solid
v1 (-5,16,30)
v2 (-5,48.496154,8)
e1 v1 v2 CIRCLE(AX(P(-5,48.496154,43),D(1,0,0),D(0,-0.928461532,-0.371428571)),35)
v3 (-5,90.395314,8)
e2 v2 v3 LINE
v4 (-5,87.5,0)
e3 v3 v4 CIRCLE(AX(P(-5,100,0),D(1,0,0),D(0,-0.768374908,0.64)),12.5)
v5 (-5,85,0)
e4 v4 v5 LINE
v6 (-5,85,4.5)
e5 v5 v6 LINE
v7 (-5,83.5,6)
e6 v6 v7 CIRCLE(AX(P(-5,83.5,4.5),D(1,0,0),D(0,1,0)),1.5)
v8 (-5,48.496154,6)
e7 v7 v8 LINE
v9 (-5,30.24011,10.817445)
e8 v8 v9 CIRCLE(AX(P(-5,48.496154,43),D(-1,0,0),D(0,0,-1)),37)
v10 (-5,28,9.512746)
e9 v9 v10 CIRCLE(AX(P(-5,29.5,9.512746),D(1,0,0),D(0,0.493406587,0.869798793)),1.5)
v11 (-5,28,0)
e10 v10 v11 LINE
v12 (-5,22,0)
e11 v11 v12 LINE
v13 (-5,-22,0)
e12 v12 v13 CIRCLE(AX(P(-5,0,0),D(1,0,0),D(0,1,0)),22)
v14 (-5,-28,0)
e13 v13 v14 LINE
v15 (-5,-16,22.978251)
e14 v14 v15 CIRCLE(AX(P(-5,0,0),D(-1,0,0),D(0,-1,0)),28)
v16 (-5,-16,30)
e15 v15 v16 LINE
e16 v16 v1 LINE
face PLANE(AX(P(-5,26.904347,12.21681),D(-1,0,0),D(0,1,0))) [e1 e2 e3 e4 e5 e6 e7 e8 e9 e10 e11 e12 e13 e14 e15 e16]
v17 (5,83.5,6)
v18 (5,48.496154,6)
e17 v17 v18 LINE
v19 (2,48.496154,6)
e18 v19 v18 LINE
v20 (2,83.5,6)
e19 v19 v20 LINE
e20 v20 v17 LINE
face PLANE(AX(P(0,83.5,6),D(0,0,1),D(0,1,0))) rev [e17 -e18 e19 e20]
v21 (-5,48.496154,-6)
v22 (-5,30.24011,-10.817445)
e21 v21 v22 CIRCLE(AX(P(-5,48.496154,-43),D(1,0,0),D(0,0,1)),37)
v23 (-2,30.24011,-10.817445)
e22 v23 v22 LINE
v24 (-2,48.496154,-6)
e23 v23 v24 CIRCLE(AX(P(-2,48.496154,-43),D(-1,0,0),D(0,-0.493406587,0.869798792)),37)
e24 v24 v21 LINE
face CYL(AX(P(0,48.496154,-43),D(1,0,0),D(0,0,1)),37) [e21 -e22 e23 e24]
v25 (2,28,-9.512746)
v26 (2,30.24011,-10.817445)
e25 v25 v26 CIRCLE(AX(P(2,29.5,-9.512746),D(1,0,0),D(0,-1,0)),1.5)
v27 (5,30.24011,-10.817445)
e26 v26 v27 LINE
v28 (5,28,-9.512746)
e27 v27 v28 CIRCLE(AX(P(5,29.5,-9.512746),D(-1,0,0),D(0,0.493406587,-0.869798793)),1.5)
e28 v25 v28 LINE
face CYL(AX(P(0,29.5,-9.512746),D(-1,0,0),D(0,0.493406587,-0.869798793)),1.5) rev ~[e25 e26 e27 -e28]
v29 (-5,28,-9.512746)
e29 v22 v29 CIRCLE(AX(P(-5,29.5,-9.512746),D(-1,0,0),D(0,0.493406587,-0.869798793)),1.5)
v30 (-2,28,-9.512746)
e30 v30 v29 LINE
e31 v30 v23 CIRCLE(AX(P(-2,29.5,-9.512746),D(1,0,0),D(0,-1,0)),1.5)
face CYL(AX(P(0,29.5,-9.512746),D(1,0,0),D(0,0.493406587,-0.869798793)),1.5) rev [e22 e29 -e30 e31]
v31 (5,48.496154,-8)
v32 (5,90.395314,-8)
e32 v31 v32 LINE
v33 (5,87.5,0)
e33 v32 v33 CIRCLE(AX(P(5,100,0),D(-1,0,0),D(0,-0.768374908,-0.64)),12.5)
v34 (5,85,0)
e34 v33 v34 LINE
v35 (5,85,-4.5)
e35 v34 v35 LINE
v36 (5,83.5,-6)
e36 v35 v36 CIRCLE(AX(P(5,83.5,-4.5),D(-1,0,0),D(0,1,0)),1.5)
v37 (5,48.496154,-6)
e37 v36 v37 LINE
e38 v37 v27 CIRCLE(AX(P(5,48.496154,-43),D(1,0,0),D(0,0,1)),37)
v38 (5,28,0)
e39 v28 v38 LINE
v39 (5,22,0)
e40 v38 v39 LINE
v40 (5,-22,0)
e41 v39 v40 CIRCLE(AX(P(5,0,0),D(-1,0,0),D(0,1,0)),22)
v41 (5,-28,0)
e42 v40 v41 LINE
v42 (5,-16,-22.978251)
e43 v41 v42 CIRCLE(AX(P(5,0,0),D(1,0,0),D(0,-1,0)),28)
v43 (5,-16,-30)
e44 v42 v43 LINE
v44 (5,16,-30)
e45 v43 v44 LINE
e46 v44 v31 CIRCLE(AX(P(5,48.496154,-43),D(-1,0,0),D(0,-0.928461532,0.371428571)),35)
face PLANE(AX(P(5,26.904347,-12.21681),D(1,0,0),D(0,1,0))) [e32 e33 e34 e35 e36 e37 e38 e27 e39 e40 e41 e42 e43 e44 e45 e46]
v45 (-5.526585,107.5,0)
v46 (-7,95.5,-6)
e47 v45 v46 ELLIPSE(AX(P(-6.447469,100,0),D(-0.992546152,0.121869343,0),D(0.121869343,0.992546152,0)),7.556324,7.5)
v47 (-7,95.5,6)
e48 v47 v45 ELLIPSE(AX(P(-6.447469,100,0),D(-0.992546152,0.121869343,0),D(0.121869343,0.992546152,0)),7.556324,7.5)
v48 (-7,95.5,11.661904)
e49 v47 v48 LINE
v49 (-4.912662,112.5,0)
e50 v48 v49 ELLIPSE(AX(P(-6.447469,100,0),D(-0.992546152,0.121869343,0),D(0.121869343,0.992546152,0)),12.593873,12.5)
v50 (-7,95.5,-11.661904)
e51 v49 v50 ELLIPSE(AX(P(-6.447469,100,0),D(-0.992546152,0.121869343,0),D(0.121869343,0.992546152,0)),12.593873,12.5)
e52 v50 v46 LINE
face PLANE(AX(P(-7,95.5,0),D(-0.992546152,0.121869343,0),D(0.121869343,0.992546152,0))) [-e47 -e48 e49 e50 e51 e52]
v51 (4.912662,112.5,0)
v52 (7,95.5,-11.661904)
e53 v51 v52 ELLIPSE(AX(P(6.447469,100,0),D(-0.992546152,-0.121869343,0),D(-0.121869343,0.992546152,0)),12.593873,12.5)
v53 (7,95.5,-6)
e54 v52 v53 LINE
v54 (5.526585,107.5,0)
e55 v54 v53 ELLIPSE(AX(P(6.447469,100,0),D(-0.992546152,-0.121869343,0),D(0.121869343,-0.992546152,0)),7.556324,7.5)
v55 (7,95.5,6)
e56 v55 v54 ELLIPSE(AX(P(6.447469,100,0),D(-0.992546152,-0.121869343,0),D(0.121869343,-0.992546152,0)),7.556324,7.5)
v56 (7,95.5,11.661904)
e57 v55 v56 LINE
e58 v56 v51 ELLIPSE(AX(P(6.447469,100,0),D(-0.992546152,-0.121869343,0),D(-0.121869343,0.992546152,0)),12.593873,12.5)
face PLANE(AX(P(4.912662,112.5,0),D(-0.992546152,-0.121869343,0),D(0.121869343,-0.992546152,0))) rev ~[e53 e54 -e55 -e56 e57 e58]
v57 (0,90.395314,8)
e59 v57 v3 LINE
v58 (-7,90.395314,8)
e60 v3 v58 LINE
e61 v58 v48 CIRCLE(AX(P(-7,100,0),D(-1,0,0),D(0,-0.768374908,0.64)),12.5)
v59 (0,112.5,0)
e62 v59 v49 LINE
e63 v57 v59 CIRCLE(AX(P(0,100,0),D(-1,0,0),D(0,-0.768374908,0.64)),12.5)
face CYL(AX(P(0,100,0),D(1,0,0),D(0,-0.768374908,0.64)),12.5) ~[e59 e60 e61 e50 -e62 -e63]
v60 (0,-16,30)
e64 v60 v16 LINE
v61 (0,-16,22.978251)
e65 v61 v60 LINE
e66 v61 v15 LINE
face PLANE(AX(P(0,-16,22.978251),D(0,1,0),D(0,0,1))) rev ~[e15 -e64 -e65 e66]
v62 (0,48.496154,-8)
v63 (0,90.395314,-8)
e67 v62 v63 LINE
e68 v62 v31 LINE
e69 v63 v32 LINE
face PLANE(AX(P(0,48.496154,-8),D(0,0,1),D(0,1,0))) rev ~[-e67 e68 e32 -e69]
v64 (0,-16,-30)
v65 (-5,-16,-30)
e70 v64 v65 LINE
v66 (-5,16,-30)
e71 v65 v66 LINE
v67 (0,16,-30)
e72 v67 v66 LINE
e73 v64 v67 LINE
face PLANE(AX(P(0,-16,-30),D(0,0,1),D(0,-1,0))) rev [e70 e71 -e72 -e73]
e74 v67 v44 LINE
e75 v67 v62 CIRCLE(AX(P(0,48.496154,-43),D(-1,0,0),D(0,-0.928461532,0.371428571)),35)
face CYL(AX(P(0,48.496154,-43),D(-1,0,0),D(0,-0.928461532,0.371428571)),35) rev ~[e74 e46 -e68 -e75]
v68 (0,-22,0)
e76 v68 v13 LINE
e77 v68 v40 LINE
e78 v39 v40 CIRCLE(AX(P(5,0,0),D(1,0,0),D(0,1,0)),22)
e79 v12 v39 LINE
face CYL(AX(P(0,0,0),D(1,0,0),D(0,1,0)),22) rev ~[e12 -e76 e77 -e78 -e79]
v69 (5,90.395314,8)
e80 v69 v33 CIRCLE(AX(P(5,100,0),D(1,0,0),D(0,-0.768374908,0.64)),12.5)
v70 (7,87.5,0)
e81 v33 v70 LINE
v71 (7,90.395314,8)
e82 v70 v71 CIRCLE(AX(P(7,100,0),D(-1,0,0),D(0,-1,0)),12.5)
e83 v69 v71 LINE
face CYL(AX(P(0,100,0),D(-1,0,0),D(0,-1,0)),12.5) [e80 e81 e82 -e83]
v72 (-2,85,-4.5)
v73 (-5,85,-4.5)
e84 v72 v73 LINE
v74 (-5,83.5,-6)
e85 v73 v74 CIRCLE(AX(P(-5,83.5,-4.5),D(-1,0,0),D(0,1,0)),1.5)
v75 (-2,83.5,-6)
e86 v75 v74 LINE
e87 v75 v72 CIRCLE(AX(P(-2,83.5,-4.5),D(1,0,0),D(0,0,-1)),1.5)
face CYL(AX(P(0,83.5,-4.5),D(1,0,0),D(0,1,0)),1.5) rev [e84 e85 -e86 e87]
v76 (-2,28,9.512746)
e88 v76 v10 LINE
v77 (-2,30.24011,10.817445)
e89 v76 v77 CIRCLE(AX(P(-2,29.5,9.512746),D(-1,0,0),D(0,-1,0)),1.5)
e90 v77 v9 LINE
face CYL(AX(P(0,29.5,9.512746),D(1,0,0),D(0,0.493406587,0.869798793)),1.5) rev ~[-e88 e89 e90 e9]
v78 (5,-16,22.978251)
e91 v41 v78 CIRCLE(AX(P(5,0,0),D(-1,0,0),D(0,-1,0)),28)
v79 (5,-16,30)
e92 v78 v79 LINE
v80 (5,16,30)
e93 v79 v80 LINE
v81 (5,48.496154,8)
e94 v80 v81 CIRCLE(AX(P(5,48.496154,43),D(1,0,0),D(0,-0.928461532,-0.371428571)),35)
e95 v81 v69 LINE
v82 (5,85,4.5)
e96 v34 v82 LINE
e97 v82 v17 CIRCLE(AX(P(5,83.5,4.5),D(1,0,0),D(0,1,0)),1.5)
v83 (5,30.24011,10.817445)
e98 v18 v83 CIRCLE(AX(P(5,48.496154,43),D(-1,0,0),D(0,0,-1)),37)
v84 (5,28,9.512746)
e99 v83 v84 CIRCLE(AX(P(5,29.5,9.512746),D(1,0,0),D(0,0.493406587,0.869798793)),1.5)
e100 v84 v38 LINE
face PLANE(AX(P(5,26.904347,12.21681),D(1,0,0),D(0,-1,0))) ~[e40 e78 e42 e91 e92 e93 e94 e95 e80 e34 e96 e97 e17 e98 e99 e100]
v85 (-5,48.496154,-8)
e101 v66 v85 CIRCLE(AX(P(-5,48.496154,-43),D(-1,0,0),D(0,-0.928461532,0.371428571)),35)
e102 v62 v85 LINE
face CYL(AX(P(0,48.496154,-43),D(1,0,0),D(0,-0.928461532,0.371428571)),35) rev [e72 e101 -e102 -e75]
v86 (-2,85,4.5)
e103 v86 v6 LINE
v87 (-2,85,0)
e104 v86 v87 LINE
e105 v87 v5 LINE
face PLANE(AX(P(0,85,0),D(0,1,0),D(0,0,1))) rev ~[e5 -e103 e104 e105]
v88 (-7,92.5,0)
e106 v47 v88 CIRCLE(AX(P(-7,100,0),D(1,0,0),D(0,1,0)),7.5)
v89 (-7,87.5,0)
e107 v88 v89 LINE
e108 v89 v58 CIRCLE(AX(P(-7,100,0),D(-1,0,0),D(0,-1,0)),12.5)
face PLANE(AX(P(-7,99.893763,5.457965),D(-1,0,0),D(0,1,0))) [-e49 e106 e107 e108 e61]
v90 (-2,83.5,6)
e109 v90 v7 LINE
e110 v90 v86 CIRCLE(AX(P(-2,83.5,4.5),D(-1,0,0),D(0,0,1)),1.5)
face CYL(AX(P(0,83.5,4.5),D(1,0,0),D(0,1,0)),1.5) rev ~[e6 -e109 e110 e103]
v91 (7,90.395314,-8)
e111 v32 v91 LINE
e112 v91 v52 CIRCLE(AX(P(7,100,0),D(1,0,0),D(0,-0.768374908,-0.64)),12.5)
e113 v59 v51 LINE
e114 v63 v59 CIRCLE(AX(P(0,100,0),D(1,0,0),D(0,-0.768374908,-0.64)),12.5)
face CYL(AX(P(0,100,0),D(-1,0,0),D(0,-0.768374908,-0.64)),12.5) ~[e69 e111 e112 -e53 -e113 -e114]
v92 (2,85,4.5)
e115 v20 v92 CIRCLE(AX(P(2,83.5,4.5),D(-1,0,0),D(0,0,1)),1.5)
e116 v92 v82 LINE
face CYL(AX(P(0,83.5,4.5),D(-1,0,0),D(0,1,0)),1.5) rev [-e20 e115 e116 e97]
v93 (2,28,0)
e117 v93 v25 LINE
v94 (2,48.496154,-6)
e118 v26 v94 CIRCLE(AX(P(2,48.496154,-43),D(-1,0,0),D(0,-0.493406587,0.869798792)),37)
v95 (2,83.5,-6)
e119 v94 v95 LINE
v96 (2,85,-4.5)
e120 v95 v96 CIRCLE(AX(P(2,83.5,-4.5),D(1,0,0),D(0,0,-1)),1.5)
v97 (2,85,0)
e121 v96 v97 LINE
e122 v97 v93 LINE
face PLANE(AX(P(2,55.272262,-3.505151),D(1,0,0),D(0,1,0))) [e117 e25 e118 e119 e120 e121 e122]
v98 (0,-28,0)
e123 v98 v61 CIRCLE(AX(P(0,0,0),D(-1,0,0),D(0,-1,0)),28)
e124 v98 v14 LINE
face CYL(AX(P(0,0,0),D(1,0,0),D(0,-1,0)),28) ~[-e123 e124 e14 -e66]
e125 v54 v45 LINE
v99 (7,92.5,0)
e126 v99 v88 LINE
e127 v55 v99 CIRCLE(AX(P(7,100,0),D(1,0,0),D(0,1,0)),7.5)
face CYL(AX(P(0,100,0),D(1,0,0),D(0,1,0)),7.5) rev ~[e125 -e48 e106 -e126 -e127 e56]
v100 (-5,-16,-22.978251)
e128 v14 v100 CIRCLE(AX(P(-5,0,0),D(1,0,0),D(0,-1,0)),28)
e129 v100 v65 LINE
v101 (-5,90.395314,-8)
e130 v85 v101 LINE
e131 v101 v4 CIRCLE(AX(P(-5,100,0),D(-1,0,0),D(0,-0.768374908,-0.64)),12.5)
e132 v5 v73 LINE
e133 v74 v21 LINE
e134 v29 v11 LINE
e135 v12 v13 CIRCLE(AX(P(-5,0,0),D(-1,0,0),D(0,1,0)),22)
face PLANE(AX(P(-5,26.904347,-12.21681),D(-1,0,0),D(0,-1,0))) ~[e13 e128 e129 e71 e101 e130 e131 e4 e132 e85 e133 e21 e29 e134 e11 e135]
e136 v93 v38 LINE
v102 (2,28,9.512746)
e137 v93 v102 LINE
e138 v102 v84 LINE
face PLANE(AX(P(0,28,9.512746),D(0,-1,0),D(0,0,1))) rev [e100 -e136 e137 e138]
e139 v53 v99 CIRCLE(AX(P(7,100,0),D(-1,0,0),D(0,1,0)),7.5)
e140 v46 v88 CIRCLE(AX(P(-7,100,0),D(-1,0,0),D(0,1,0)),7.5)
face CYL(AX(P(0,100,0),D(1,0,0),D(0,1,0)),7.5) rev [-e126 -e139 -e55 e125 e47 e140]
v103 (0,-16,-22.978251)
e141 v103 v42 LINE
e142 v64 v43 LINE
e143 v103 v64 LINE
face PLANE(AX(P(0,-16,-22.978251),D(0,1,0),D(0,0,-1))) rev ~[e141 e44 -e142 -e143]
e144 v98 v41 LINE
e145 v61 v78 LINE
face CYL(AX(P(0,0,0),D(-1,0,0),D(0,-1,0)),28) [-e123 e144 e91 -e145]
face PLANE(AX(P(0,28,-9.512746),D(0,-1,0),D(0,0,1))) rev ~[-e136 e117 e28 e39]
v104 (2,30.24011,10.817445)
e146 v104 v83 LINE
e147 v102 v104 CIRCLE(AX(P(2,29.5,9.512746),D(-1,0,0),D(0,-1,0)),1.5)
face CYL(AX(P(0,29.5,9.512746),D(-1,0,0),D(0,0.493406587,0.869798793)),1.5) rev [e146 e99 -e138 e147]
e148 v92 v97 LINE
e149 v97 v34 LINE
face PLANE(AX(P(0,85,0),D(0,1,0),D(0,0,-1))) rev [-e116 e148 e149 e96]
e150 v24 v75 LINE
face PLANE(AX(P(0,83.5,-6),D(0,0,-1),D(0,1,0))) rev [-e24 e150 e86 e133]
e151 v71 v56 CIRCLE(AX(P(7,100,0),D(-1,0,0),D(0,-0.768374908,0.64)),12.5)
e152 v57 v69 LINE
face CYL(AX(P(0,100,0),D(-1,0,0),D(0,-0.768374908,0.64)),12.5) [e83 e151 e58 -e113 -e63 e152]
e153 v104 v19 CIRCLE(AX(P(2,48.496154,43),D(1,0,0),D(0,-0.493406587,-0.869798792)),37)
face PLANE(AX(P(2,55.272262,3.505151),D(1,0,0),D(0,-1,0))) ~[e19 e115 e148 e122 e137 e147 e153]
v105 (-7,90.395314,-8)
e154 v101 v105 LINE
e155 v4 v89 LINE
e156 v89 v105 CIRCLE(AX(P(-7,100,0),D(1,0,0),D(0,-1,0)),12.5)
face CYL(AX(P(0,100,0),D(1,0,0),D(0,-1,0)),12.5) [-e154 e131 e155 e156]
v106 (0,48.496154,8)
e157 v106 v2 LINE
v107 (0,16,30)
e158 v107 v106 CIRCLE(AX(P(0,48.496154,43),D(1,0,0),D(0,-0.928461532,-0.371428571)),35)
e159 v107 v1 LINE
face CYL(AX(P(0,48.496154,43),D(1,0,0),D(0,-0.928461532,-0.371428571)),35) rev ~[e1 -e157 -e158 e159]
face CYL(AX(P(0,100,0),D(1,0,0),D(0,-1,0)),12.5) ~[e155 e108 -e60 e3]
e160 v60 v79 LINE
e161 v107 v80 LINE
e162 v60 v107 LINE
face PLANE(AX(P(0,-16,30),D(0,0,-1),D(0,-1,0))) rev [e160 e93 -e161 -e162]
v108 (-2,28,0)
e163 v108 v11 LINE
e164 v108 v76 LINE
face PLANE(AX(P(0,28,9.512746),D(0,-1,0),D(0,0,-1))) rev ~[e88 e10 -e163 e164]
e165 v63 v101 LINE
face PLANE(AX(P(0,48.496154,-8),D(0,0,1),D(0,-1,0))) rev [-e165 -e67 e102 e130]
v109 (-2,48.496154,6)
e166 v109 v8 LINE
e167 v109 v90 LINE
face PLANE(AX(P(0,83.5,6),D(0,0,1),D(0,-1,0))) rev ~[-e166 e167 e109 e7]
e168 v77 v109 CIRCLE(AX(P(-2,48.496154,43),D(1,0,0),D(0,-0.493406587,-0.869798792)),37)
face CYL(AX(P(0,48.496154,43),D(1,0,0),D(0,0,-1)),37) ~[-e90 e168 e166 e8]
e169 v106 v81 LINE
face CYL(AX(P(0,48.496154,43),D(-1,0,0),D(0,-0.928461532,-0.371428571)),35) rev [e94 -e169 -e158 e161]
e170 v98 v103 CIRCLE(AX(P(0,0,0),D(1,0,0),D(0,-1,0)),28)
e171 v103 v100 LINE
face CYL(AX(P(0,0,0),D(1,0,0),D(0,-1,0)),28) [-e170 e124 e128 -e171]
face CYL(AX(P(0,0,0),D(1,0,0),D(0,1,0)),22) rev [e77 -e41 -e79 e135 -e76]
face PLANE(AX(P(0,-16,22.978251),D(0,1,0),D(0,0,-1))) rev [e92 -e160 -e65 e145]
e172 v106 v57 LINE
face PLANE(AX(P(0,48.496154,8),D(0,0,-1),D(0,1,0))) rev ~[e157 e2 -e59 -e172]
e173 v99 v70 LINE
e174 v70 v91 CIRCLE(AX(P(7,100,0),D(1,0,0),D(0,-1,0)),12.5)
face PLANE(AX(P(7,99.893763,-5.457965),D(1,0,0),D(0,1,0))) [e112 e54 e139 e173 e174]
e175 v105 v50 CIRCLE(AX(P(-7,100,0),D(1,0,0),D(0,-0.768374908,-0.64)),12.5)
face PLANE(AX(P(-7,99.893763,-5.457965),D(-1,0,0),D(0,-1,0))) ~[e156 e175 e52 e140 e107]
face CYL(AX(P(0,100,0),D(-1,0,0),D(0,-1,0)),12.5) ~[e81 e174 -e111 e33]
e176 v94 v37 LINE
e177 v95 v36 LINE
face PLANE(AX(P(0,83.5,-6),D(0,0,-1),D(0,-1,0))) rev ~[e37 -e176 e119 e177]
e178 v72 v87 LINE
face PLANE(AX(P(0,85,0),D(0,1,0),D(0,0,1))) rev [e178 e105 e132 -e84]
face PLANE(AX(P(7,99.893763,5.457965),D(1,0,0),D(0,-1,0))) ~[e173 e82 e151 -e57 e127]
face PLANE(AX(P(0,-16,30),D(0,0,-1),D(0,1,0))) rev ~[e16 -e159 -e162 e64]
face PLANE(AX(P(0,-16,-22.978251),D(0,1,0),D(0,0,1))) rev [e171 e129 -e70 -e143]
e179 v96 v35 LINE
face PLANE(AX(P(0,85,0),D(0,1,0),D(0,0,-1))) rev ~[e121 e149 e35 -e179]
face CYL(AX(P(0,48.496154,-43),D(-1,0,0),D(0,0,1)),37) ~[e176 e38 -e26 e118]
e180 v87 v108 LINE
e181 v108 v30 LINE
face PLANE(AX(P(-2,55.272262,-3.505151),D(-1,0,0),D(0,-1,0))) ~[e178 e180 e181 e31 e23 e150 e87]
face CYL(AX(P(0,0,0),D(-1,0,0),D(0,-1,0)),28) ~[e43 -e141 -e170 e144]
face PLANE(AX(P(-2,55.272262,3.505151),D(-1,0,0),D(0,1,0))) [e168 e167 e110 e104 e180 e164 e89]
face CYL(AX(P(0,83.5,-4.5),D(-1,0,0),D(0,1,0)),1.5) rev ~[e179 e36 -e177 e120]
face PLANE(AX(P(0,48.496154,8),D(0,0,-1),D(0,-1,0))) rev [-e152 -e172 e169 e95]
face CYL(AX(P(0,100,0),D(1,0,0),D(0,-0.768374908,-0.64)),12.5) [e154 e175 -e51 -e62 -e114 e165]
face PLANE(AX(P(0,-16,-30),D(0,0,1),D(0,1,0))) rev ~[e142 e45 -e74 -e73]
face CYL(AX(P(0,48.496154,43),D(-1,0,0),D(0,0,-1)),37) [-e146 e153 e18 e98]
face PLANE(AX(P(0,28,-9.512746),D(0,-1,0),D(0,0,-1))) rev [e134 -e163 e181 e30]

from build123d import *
from build123d import SkipClean  # not in build123d's __all__

# Parameters (mm, degrees)
F1_DEPTH = 7
F2_DEPTH = 5
F3_DEPTH = 2
F7_DEPTH = 25


with BuildPart() as f1:
    # F0 (on Right) → F1 (new body)
    with BuildSketch(Plane.YZ):
        with BuildLine():
            ThreePointArc((107.5, 0), (100, -7.5), (92.5, 0))
            Line((92.5, 0), (87.5, 0))
            ThreePointArc((87.5, 0), (88.2460947032, -4.2539052968), (90.3953136439, -8))
            ThreePointArc((90.3953136439, -8), (104.2539052968, -11.7539052968), (112.5, 0))
            Line((112.5, 0), (107.5, 0))
        make_face()
    extrude(amount=F1_DEPTH)

    # F0 (on Right) → F2 (join)
    with BuildSketch(Plane.YZ):
        with BuildLine():
            ThreePointArc((90.3953136439, -8), (88.2460947032, -4.2539052968), (87.5, 0))
            Line((87.5, 0), (85, 0))
            Line((85, 0), (85, -4.5))
            ThreePointArc((85, -4.5), (84.5606601718, -5.5606601718), (83.5, -6))
            Line((83.5, -6), (48.4961536185, -6))
            ThreePointArc((48.4961536185, -6), (39.0556702336, -7.2246275567), (30.2401098812, -10.8174446779))
            ThreePointArc((30.2401098812, -10.8174446779), (28.7450711364, -10.8089264191), (28, -9.5127464891))
            Line((28, -9.5127464891), (28, 0))
            Line((28, 0), (22, 0))
            ThreePointArc((22, 0), (0, -22), (-22, 0))
            Line((-22, 0), (-28, 0))
            ThreePointArc((-28, 0), (-24.819347292, -12.9614813968), (-16, -22.9782505862))
            Line((-16, -22.9782505862), (-16, -30))
            Line((-16, -30), (16, -30))
            ThreePointArc((16, -30), (28.8747367482, -14.0172465076), (48.4961536185, -8))
            Line((48.4961536185, -8), (90.3953136439, -8))
        make_face()
    extrude(amount=F2_DEPTH)

    # F0 (on Right) → F3 (join)
    with BuildSketch(Plane.YZ):
        with BuildLine():
            Line((85, -4.5), (85, 0))
            Line((85, 0), (28, 0))
            Line((28, 0), (28, -9.5127464891))
            ThreePointArc((28, -9.5127464891), (28.7450711364, -10.8089264191), (30.2401098812, -10.8174446779))
            ThreePointArc((30.2401098812, -10.8174446779), (39.0556702336, -7.2246275567), (48.4961536185, -6))
            Line((48.4961536185, -6), (83.5, -6))
            ThreePointArc((83.5, -6), (84.5606601718, -5.5606601718), (85, -4.5))
        make_face()
    extrude(amount=F3_DEPTH)

    # F4: F1 across plane


with BuildPart() as f1_1:
    add(f1.part, clean=False)
    add(f1.part.mirror(Plane.YZ), clean=False)

    # F5: F1 across plane


with BuildPart() as f1_2:
    add(f1_1.part, clean=False)
    with SkipClean():  # cleaning this boolean's faces spoils the solid; the shape is the same uncleaned
        add(f1_1.part.mirror(Plane.XY), clean=False)

    # F6 (on Top) → F7 (cut, symmetric)
    with BuildSketch(Plane.XY):
        Polygon((-7, 112.5), (-7, 95.5), (-4.9126624647, 112.5), align=None)
        Polygon((4.9126624647, 112.5), (7, 95.5), (7, 112.5), align=None)
    with SkipClean():  # cleaning this boolean's faces spoils the solid; the shape is the same uncleaned
        extrude(amount=F7_DEPTH, both=True, mode=Mode.SUBTRACT)


solid = f1_2.part
